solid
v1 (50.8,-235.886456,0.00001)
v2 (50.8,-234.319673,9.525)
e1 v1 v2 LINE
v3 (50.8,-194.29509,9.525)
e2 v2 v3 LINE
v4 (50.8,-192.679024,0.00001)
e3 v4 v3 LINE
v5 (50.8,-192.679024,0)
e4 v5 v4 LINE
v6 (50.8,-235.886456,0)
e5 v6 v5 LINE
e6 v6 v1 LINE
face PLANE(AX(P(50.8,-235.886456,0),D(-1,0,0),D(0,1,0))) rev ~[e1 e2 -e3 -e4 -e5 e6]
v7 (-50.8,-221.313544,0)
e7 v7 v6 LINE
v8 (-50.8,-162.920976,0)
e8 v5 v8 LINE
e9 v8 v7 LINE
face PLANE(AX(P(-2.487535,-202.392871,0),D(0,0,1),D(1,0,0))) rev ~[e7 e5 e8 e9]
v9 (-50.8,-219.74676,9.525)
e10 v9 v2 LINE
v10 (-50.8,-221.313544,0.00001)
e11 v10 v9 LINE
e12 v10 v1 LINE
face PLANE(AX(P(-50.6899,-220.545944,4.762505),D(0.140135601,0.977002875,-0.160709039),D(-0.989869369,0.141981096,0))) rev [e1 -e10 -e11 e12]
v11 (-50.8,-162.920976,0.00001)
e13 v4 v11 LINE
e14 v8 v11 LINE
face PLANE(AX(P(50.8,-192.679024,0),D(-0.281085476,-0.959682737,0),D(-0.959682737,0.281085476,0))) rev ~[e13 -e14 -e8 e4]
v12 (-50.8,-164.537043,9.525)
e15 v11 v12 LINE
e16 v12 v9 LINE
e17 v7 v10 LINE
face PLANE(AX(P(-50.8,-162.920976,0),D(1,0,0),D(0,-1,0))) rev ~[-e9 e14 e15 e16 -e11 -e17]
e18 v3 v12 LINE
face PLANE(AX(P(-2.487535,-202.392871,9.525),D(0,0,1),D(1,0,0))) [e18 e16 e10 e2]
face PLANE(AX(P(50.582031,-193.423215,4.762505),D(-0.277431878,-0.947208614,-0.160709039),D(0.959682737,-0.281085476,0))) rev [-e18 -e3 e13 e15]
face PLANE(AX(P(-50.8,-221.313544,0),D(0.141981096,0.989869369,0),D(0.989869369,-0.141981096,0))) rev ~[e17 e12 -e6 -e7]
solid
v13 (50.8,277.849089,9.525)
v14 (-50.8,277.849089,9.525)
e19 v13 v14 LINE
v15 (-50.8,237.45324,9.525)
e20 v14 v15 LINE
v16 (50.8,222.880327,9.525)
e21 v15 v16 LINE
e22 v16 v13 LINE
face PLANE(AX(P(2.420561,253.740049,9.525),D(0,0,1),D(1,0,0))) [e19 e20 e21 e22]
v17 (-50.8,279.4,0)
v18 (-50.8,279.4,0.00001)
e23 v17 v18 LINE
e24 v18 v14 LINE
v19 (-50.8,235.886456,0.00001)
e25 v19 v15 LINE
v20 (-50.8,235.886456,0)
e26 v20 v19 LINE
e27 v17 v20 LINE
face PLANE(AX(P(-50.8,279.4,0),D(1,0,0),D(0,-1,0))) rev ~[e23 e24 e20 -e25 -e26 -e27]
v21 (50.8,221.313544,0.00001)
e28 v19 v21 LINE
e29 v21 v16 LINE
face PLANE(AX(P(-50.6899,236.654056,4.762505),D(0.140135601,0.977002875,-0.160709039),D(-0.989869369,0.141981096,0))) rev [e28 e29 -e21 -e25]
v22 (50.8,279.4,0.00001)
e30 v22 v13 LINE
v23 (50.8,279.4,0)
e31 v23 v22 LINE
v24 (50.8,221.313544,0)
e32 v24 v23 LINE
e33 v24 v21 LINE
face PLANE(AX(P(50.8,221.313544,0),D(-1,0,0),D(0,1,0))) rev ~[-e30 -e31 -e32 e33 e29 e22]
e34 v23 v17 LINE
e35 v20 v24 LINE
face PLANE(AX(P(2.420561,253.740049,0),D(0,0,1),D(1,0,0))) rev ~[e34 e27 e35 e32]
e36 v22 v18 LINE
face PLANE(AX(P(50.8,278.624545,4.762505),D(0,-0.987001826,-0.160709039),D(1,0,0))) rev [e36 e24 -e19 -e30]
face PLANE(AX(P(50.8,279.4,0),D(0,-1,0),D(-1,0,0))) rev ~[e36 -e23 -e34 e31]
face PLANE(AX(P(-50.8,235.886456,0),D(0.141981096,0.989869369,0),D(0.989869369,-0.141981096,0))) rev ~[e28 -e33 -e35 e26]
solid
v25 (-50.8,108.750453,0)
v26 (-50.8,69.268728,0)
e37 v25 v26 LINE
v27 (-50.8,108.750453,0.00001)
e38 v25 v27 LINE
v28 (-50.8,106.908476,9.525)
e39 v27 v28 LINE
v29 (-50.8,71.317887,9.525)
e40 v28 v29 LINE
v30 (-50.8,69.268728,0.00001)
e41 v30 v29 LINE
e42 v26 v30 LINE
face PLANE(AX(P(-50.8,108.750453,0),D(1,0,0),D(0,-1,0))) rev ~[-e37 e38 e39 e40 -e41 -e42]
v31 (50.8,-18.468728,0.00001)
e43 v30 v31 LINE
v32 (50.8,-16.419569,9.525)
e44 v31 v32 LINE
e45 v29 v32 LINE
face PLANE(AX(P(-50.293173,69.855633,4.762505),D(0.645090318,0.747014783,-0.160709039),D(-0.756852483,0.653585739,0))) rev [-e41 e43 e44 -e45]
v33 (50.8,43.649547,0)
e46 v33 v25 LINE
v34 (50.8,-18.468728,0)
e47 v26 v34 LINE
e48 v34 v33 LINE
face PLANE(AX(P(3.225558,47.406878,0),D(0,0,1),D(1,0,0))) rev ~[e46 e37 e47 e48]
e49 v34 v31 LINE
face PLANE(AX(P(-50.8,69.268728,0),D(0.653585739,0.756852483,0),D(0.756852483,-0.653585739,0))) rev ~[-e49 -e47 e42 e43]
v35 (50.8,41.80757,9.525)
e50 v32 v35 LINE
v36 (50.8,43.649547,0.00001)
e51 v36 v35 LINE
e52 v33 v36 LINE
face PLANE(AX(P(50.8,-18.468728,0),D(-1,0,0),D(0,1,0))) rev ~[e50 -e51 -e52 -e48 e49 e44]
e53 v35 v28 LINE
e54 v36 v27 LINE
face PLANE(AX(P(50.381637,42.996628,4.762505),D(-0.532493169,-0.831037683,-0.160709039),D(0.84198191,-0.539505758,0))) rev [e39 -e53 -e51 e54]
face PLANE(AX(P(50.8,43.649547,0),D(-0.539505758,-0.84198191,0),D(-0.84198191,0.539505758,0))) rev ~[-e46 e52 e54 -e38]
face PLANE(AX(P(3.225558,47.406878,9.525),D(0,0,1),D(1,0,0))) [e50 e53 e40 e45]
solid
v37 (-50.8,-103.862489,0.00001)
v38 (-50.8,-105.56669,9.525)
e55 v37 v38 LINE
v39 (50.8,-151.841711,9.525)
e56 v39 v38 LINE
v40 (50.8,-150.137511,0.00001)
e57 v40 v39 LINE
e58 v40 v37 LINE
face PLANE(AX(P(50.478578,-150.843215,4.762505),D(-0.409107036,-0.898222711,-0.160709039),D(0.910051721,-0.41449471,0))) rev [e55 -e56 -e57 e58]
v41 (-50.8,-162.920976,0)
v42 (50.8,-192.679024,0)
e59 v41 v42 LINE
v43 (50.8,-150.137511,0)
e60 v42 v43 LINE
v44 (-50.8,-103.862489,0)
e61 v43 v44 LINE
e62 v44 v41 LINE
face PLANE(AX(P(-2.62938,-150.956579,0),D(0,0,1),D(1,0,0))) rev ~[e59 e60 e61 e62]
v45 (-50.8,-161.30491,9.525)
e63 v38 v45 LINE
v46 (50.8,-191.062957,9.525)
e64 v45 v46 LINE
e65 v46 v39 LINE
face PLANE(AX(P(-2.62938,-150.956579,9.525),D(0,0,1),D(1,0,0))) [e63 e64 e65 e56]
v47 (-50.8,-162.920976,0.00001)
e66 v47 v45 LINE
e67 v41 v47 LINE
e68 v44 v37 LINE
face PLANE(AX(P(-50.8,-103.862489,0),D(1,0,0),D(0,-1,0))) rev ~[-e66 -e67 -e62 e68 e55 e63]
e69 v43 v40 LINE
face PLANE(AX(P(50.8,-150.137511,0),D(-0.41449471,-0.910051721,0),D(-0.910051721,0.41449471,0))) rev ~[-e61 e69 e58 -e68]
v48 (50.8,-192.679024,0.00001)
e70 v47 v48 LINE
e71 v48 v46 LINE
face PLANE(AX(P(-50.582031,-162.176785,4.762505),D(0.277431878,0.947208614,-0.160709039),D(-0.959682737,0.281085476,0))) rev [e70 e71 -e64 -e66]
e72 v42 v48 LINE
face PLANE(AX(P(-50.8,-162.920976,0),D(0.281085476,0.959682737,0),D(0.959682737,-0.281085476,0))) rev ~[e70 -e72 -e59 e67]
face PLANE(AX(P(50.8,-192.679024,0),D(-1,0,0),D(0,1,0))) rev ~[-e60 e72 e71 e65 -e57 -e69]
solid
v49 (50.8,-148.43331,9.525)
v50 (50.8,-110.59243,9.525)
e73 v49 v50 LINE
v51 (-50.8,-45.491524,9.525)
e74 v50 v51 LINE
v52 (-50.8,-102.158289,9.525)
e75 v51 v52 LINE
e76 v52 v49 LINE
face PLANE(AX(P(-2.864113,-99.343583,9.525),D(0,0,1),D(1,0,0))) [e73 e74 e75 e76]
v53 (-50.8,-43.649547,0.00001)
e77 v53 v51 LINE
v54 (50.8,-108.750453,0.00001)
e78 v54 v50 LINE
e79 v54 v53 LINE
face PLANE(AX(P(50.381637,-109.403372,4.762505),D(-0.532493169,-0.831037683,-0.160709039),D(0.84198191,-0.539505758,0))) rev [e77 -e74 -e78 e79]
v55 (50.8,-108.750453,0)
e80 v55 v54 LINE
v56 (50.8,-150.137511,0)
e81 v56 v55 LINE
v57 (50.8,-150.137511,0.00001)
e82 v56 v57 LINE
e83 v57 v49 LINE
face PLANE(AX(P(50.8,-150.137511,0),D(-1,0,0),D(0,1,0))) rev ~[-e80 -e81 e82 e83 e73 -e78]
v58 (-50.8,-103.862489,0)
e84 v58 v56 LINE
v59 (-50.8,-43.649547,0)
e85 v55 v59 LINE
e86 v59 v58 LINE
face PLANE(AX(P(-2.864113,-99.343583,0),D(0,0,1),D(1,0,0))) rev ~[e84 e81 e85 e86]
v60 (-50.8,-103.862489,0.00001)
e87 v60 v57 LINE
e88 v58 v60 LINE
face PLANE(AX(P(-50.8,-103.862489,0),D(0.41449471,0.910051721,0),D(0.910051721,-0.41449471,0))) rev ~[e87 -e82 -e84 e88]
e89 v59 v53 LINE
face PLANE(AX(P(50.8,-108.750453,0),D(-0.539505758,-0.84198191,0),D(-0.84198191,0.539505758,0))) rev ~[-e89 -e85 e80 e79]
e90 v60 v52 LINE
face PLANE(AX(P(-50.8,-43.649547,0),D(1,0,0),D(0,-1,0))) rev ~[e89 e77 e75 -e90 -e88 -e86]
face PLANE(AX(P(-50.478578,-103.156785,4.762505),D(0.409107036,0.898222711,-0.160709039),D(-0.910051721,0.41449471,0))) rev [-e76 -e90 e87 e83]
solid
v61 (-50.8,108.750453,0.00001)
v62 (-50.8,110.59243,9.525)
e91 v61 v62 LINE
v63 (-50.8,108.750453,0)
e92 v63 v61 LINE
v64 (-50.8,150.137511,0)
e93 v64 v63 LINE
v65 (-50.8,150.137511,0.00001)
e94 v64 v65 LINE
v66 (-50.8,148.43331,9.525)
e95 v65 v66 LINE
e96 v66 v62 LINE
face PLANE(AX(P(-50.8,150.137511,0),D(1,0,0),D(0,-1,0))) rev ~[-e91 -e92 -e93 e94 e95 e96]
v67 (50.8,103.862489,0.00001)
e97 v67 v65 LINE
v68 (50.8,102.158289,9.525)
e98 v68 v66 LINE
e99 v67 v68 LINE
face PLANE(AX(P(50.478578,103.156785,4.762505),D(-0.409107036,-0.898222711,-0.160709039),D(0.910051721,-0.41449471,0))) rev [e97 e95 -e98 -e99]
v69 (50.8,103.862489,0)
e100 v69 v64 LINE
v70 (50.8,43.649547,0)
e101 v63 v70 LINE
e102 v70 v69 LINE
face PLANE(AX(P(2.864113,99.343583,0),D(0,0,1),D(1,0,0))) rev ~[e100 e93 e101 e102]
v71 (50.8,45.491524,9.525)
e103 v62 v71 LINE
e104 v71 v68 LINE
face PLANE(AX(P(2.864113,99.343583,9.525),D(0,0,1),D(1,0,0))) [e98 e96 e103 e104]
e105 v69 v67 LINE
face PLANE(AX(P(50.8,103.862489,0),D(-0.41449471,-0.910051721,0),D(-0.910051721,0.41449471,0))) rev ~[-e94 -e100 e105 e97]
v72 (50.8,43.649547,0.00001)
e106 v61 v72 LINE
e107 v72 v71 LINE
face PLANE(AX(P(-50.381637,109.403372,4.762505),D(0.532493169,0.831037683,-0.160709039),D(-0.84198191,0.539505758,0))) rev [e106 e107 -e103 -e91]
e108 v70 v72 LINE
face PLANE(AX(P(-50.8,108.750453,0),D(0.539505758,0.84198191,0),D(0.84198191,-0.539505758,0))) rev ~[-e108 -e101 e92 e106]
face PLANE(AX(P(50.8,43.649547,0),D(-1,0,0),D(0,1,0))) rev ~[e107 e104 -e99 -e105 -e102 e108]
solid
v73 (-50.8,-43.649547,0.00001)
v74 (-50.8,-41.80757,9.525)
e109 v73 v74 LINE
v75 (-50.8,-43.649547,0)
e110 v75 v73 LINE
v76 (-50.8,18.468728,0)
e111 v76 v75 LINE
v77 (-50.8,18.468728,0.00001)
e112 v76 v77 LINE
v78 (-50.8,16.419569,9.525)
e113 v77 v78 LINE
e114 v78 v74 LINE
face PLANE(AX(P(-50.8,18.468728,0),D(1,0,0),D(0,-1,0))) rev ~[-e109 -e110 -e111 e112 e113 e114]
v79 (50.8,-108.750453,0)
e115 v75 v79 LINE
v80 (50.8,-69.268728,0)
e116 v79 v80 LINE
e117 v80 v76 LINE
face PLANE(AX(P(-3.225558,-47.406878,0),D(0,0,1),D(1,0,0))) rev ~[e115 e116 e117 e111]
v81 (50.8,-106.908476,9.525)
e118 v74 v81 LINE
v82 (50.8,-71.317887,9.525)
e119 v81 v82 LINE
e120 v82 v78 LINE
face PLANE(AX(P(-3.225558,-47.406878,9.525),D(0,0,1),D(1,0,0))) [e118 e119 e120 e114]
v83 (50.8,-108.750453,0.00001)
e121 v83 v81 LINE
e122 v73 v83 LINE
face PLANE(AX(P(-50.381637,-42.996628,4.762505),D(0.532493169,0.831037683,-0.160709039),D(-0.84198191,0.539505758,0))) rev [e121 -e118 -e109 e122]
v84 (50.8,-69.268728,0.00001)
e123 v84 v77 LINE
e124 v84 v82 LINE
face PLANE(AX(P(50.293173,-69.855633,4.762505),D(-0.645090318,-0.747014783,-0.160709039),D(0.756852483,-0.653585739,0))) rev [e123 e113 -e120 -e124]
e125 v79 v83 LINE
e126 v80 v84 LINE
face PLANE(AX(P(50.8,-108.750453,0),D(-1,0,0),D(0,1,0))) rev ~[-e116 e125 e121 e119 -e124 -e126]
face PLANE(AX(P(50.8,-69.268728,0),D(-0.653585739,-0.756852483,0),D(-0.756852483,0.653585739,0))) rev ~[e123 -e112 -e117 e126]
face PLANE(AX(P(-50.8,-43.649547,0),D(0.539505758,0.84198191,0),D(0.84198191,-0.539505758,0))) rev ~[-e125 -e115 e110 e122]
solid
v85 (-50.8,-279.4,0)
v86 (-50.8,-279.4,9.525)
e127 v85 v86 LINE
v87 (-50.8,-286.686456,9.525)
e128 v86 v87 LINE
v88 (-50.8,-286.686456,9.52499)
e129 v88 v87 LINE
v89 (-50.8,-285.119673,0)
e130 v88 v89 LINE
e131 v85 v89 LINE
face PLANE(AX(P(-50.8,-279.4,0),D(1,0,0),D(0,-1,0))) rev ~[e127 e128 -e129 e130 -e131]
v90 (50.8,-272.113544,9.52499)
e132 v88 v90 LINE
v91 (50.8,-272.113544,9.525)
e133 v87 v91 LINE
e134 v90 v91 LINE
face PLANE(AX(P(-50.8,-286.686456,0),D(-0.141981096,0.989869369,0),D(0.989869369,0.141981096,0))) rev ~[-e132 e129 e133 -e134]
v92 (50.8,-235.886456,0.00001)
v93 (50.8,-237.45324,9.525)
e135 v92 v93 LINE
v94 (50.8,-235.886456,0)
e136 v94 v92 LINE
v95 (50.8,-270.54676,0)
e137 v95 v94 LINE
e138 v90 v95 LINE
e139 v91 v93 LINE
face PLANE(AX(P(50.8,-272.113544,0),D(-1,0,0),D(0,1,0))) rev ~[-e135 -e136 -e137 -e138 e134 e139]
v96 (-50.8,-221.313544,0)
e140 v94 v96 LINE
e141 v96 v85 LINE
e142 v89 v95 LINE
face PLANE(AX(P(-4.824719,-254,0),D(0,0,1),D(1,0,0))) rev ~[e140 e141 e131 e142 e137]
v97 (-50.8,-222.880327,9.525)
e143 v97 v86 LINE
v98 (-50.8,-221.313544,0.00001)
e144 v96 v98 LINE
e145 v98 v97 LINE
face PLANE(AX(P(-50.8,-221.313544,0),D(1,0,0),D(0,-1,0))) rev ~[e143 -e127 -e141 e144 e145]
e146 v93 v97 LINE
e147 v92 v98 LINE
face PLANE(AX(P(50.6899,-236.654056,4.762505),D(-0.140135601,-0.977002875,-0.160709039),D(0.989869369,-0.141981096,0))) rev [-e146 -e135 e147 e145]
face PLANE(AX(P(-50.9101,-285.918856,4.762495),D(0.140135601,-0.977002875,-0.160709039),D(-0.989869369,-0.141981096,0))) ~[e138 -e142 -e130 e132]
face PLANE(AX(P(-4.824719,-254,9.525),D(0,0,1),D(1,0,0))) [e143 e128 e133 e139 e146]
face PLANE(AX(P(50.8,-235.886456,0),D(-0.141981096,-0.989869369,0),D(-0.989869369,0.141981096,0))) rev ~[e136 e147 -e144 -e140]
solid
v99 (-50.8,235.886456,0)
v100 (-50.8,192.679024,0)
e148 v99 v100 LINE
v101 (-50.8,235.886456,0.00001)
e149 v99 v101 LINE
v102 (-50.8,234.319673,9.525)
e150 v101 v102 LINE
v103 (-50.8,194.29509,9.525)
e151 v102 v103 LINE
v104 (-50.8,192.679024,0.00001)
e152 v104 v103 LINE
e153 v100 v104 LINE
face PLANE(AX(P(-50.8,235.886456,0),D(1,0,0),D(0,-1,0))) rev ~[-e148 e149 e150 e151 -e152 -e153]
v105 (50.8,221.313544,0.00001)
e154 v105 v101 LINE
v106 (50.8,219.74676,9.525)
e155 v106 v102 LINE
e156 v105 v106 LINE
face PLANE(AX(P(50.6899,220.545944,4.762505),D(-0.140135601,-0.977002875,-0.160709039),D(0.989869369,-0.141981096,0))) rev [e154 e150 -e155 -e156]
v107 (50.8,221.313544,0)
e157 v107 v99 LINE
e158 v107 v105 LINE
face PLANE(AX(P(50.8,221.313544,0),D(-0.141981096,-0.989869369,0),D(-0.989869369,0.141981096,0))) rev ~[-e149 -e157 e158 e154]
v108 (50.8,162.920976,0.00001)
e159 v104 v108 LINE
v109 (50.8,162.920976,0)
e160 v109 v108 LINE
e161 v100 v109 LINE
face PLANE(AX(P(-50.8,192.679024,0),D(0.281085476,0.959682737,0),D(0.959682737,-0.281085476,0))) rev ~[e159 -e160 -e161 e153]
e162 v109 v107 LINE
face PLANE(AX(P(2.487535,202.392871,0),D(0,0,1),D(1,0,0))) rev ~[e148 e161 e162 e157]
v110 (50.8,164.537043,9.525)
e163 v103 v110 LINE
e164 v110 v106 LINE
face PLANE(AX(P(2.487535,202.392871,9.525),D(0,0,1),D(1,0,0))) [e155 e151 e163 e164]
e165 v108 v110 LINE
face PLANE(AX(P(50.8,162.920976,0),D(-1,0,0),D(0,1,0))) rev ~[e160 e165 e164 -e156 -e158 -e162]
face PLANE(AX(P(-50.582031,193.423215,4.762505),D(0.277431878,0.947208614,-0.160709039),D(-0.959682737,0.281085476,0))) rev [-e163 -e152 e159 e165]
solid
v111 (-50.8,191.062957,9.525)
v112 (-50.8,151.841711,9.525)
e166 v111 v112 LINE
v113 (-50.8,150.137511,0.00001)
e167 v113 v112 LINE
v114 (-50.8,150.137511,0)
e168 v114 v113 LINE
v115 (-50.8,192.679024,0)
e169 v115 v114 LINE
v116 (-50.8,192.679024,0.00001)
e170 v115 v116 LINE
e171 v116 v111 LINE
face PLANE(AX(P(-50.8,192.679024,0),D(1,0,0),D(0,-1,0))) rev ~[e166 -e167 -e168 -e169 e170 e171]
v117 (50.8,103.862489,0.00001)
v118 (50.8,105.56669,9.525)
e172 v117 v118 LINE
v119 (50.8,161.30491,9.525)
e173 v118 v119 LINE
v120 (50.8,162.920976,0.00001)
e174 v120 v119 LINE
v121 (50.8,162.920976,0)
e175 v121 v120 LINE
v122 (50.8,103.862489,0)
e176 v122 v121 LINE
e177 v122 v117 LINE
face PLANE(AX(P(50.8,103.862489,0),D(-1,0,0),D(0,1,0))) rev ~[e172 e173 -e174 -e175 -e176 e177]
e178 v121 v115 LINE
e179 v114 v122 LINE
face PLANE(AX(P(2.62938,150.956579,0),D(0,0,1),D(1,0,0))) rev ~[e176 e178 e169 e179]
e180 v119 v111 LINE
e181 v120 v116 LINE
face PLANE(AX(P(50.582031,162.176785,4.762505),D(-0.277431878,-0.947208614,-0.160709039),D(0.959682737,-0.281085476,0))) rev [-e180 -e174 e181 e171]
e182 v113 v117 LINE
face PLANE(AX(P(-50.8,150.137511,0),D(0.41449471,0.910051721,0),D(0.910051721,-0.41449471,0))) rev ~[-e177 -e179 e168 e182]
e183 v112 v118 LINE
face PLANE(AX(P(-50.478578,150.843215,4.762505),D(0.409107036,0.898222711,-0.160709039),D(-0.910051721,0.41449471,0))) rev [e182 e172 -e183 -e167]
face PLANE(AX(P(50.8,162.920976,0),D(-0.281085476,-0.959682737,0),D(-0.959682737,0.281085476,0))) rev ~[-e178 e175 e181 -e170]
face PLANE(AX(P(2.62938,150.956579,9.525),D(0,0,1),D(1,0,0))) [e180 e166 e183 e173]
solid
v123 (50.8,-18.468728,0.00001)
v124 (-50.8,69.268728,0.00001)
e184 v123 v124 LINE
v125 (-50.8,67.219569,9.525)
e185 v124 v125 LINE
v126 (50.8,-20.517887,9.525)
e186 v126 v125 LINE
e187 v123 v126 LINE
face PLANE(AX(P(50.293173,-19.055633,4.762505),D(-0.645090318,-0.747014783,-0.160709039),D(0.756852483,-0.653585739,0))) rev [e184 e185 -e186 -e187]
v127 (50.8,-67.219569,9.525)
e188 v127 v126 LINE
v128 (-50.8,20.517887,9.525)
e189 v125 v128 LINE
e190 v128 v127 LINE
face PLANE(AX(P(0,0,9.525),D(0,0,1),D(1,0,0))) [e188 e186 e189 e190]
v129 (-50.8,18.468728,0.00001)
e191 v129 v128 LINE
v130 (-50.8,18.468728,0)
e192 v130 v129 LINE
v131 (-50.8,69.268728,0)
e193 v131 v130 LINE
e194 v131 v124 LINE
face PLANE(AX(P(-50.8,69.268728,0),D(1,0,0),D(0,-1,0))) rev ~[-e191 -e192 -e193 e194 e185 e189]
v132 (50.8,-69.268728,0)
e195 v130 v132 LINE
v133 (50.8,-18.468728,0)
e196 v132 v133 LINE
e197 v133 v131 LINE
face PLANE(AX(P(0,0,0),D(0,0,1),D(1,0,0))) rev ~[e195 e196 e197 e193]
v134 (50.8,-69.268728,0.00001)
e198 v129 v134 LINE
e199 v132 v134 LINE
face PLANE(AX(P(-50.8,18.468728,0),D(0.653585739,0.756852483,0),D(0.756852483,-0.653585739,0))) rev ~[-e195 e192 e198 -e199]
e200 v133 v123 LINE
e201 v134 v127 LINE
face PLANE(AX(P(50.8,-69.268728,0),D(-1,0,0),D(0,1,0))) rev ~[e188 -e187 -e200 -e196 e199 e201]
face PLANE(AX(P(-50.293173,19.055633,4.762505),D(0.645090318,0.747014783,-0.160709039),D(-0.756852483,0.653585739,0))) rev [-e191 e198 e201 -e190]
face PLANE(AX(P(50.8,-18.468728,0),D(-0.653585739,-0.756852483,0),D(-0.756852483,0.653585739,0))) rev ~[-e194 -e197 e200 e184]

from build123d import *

# Parameters (mm, degrees)
F2_DEPTH    = 9.525
F3_DEPTH    = 9.525
F4_DEPTH    = 9.525
F5_DEPTH    = 9.525
F6_DEPTH    = 9.525
F7_DEPTH    = 9.525
F8_DEPTH    = 9.525
F9_DEPTH    = 9.525
F10_DEPTH   = 9.525
F11_DEPTH   = 9.525
F12_DEPTH   = 9.525
F13_SIZE2   = 1.550911
F13_SIZE    = 9.52499
F13_2_SIZE2 = 1.550911
F13_2_SIZE  = 9.52499
F14_SIZE2   = 1.550911
F14_SIZE    = 9.52499
F14_2_SIZE2 = 1.550911
F14_2_SIZE  = 9.52499
F15_SIZE2   = 1.550911
F15_SIZE    = 9.52499
F15_2_SIZE2 = 1.550911
F15_2_SIZE  = 9.52499
F16_SIZE2   = 1.550911
F16_SIZE    = 9.52499
F16_2_SIZE2 = 1.550911
F16_2_SIZE  = 9.52499
F17_SIZE2   = 1.550911
F17_SIZE    = 9.52499
F17_2_SIZE2 = 1.550911
F17_2_SIZE  = 9.52499
F18_SIZE2   = 1.550911
F18_SIZE    = 9.52499
F18_2_SIZE2 = 1.550911
F18_2_SIZE  = 9.52499
F19_SIZE2   = 1.550911
F19_SIZE    = 9.52499
F19_2_SIZE2 = 1.550911
F19_2_SIZE  = 9.52499
F20_SIZE2   = 1.550911
F20_SIZE    = 9.52499
F20_2_SIZE2 = 1.550911
F20_2_SIZE  = 9.52499
F21_SIZE2   = 1.550911
F21_SIZE    = 9.52499
F21_2_SIZE2 = 1.550911
F21_2_SIZE  = 9.52499
F22_SIZE2   = 1.550911
F22_SIZE    = 9.52499
F22_2_SIZE2 = 1.550911
F22_2_SIZE  = 9.52499
F23_SIZE2   = 1.550911
F23_SIZE    = 9.52499
F24_SIZE2   = 1.550911
F24_SIZE    = 9.52499


# Not quite as in the source:
# - a fillet or chamfer is up to 0.001 mm smaller than in the source, because OpenCascade refuses the exact size


with BuildPart() as f2:
    # F1 (on Top) → F2 (new body)
    with BuildSketch(Plane.XY):
        Polygon((50.8, 279.4), (-50.8, 279.4), (-50.8, 235.8864560812), (50.8, 221.3135439188), align=None)
    extrude(amount=F2_DEPTH)

    # F13 (size 9.525 and 1.5509205186 in the source; OpenCascade refuses exactly that, so slightly less here)
    f13_edges = [f2.edges().sort_by_distance(p)[0] for p in [
        (0, 228.6, 9.525),
    ]]
    f13_side = f2.faces().sort_by_distance((0, 228.6, 4.7625))[0]
    chamfer(f13_edges, length=F13_SIZE, length2=F13_SIZE2, reference=f13_side)

    # F13#2 (size 9.525 and 1.5509205186 in the source; OpenCascade refuses exactly that, so slightly less here)
    f13_2_edges = [f2.edges().sort_by_distance(p)[0] for p in [
        (0, 279.4, 9.525),
    ]]
    f13_2_side = f2.faces().sort_by_distance((0, 279.4, 4.7625))[0]
    chamfer(f13_2_edges, length=F13_2_SIZE, length2=F13_2_SIZE2, reference=f13_2_side)


with BuildPart() as f3:
    # F1 (on Top) → F3 (new body)
    with BuildSketch(Plane.XY):
        Polygon((50.8, 221.3135439188), (-50.8, 235.8864560812), (-50.8, 192.6790237109), (50.8, 162.9209762891), align=None)
    extrude(amount=F3_DEPTH)

    # F14 (size 9.525 and 1.5509205186 in the source; OpenCascade refuses exactly that, so slightly less here)
    f14_edges = [f3.edges().sort_by_distance(p)[0] for p in [
        (0, 228.6, 9.525),
    ]]
    f14_side = f3.faces().sort_by_distance((0, 228.6, 4.7625))[0]
    chamfer(f14_edges, length=F14_SIZE, length2=F14_SIZE2, reference=f14_side)

    # F14#2 (size 9.525 and 1.5509205186 in the source; OpenCascade refuses exactly that, so slightly less here)
    f14_2_edges = [f3.edges().sort_by_distance(p)[0] for p in [
        (0, 177.8, 9.525),
    ]]
    f14_2_side = f3.faces().sort_by_distance((0, 177.8, 4.7625))[0]
    chamfer(f14_2_edges, length=F14_2_SIZE, length2=F14_2_SIZE2, reference=f14_2_side)


with BuildPart() as f4:
    # F1 (on Top) → F4 (new body)
    with BuildSketch(Plane.XY):
        Polygon((50.8, 162.9209762891), (-50.8, 192.6790237109), (-50.8, 150.1375105152), (50.8, 103.8624894848), align=None)
    extrude(amount=F4_DEPTH)

    # F15 (size 9.525 and 1.5509205186 in the source; OpenCascade refuses exactly that, so slightly less here)
    f15_edges = [f4.edges().sort_by_distance(p)[0] for p in [
        (0, 177.8, 9.525),
    ]]
    f15_side = f4.faces().sort_by_distance((0, 177.8, 4.7625))[0]
    chamfer(f15_edges, length=F15_SIZE, length2=F15_SIZE2, reference=f15_side)

    # F15#2 (size 9.525 and 1.5509205186 in the source; OpenCascade refuses exactly that, so slightly less here)
    f15_2_edges = [f4.edges().sort_by_distance(p)[0] for p in [
        (0, 127, 9.525),
    ]]
    f15_2_side = f4.faces().sort_by_distance((0, 127, 4.7625))[0]
    chamfer(f15_2_edges, length=F15_2_SIZE, length2=F15_2_SIZE2, reference=f15_2_side)


with BuildPart() as f5:
    # F1 (on Top) → F5 (new body)
    with BuildSketch(Plane.XY):
        Polygon((50.8, 103.8624894848), (-50.8, 150.1375105152), (-50.8, 108.75045291), (50.8, 43.64954709), align=None)
    extrude(amount=F5_DEPTH)

    # F16 (size 9.525 and 1.5509205186 in the source; OpenCascade refuses exactly that, so slightly less here)
    f16_edges = [f5.edges().sort_by_distance(p)[0] for p in [
        (0, 127, 9.525),
    ]]
    f16_side = f5.faces().sort_by_distance((0, 127, 4.7625))[0]
    chamfer(f16_edges, length=F16_SIZE, length2=F16_SIZE2, reference=f16_side)

    # F16#2 (size 9.525 and 1.5509205186 in the source; OpenCascade refuses exactly that, so slightly less here)
    f16_2_edges = [f5.edges().sort_by_distance(p)[0] for p in [
        (0, 76.2, 9.525),
    ]]
    f16_2_side = f5.faces().sort_by_distance((0, 76.2, 4.7625))[0]
    chamfer(f16_2_edges, length=F16_2_SIZE, length2=F16_2_SIZE2, reference=f16_2_side)


with BuildPart() as f6:
    # F1 (on Top) → F6 (new body)
    with BuildSketch(Plane.XY):
        Polygon((50.8, 43.64954709), (-50.8, 108.75045291), (-50.8, 69.2687277608), (50.8, -18.4687277608), align=None)
    extrude(amount=F6_DEPTH)

    # F17 (size 9.525 and 1.5509205186 in the source; OpenCascade refuses exactly that, so slightly less here)
    f17_edges = [f6.edges().sort_by_distance(p)[0] for p in [
        (0, 25.4, 9.525),
    ]]
    f17_side = f6.faces().sort_by_distance((0, 25.4, 4.7625))[0]
    chamfer(f17_edges, length=F17_SIZE, length2=F17_SIZE2, reference=f17_side)

    # F17#2 (size 9.525 and 1.5509205186 in the source; OpenCascade refuses exactly that, so slightly less here)
    f17_2_edges = [f6.edges().sort_by_distance(p)[0] for p in [
        (0, 76.2, 9.525),
    ]]
    f17_2_side = f6.faces().sort_by_distance((0, 76.2, 4.7625))[0]
    chamfer(f17_2_edges, length=F17_2_SIZE, length2=F17_2_SIZE2, reference=f17_2_side)


with BuildPart() as f7:
    # F1 (on Top) → F7 (new body)
    with BuildSketch(Plane.XY):
        Polygon((50.8, -18.4687277608), (-50.8, 69.2687277608), (-50.8, 18.4687277609), (50.7999999999, -69.2687277608), align=None)
    extrude(amount=F7_DEPTH)

    # F18 (size 9.525 and 1.5509205186 in the source; OpenCascade refuses exactly that, so slightly less here)
    f18_edges = [f7.edges().sort_by_distance(p)[0] for p in [
        (0, 25.4, 9.525),
    ]]
    f18_side = f7.faces().sort_by_distance((0, 25.4, 4.7625))[0]
    chamfer(f18_edges, length=F18_SIZE, length2=F18_SIZE2, reference=f18_side)

    # F18#2 (size 9.525 and 1.5509205186 in the source; OpenCascade refuses exactly that, so slightly less here)
    f18_2_edges = [f7.edges().sort_by_distance(p)[0] for p in [
        (0, -25.4, 9.525),
    ]]
    f18_2_side = f7.faces().sort_by_distance((0, -25.4, 4.7625))[0]
    chamfer(f18_2_edges, length=F18_2_SIZE, length2=F18_2_SIZE2, reference=f18_2_side)


with BuildPart() as f8:
    # F1 (on Top) → F8 (new body)
    with BuildSketch(Plane.XY):
        Polygon((50.7999999999, -69.2687277608), (-50.8000000001, 18.4687277609), (-50.8, -43.64954709), (50.7999999999, -108.7504529099), align=None)
    extrude(amount=F8_DEPTH)

    # F19 (size 9.525 and 1.5509205186 in the source; OpenCascade refuses exactly that, so slightly less here)
    f19_edges = [f8.edges().sort_by_distance(p)[0] for p in [
        (0, -25.4, 9.525),
    ]]
    f19_side = f8.faces().sort_by_distance((0, -25.4, 4.7625))[0]
    chamfer(f19_edges, length=F19_SIZE, length2=F19_SIZE2, reference=f19_side)

    # F19#2 (size 9.525 and 1.5509205186 in the source; OpenCascade refuses exactly that, so slightly less here)
    f19_2_edges = [f8.edges().sort_by_distance(p)[0] for p in [
        (0, -76.2, 9.525),
    ]]
    f19_2_side = f8.faces().sort_by_distance((0, -76.2, 4.7625))[0]
    chamfer(f19_2_edges, length=F19_2_SIZE, length2=F19_2_SIZE2, reference=f19_2_side)


with BuildPart() as f9:
    # F1 (on Top) → F9 (new body)
    with BuildSketch(Plane.XY):
        Polygon((50.7999999999, -108.7504529099), (-50.8000000001, -43.64954709), (-50.8, -103.8624894848), (50.7999999999, -150.1375105152), align=None)
    extrude(amount=F9_DEPTH)

    # F20 (size 9.525 and 1.5509205186 in the source; OpenCascade refuses exactly that, so slightly less here)
    f20_edges = [f9.edges().sort_by_distance(p)[0] for p in [
        (0, -76.2, 9.525),
    ]]
    f20_side = f9.faces().sort_by_distance((0, -76.2, 4.7625))[0]
    chamfer(f20_edges, length=F20_SIZE, length2=F20_SIZE2, reference=f20_side)

    # F20#2 (size 9.525 and 1.5509205186 in the source; OpenCascade refuses exactly that, so slightly less here)
    f20_2_edges = [f9.edges().sort_by_distance(p)[0] for p in [
        (0, -127, 9.525),
    ]]
    f20_2_side = f9.faces().sort_by_distance((0, -127, 4.7625))[0]
    chamfer(f20_2_edges, length=F20_2_SIZE, length2=F20_2_SIZE2, reference=f20_2_side)


with BuildPart() as f10:
    # F1 (on Top) → F10 (new body)
    with BuildSketch(Plane.XY):
        Polygon((50.7999999999, -150.1375105152), (-50.8000000001, -103.8624894848), (-50.8, -162.9209762891), (50.7999999999, -192.6790237109), align=None)
    extrude(amount=F10_DEPTH)

    # F21 (size 9.525 and 1.5509205186 in the source; OpenCascade refuses exactly that, so slightly less here)
    f21_edges = [f10.edges().sort_by_distance(p)[0] for p in [
        (0, -127, 9.525),
    ]]
    f21_side = f10.faces().sort_by_distance((0, -127, 4.7625))[0]
    chamfer(f21_edges, length=F21_SIZE, length2=F21_SIZE2, reference=f21_side)

    # F21#2 (size 9.525 and 1.5509205186 in the source; OpenCascade refuses exactly that, so slightly less here)
    f21_2_edges = [f10.edges().sort_by_distance(p)[0] for p in [
        (0, -177.8, 9.525),
    ]]
    f21_2_side = f10.faces().sort_by_distance((0, -177.8, 4.7625))[0]
    chamfer(f21_2_edges, length=F21_2_SIZE, length2=F21_2_SIZE2, reference=f21_2_side)


with BuildPart() as f11:
    # F1 (on Top) → F11 (new body)
    with BuildSketch(Plane.XY):
        Polygon((50.7999999999, -192.6790237109), (-50.8000000001, -162.9209762891), (-50.8, -221.3135439188), (50.7999999999, -235.8864560811), align=None)
    extrude(amount=F11_DEPTH)

    # F22 (size 9.525 and 1.5509205186 in the source; OpenCascade refuses exactly that, so slightly less here)
    f22_edges = [f11.edges().sort_by_distance(p)[0] for p in [
        (0, -177.8, 9.525),
    ]]
    f22_side = f11.faces().sort_by_distance((0, -177.8, 4.7625))[0]
    chamfer(f22_edges, length=F22_SIZE, length2=F22_SIZE2, reference=f22_side)

    # F22#2 (size 9.525 and 1.5509205186 in the source; OpenCascade refuses exactly that, so slightly less here)
    f22_2_edges = [f11.edges().sort_by_distance(p)[0] for p in [
        (0, -228.6, 9.525),
    ]]
    f22_2_side = f11.faces().sort_by_distance((0, -228.6, 4.7625))[0]
    chamfer(f22_2_edges, length=F22_2_SIZE, length2=F22_2_SIZE2, reference=f22_2_side)


with BuildPart() as f12:
    # F1 (on Top) → F12 (new body)
    with BuildSketch(Plane.XY):
        Polygon((50.7999999999, -235.8864560811), (-50.8000000001, -221.3135439188), (-50.8, -279.4), (-50.8, -286.6864560812), (50.8, -272.1135439188), align=None)
    extrude(amount=F12_DEPTH)

    # F23 (size 9.525 and 1.5509205186 in the source; OpenCascade refuses exactly that, so slightly less here)
    f23_edges = [f12.edges().sort_by_distance(p)[0] for p in [
        (0, -228.6, 9.525),
    ]]
    f23_side = f12.faces().sort_by_distance((0, -228.6, 4.7625))[0]
    chamfer(f23_edges, length=F23_SIZE, length2=F23_SIZE2, reference=f23_side)

    # F24 (size 9.525 and 1.5509205186 in the source; OpenCascade refuses exactly that, so slightly less here)
    f24_edges = [f12.edges().sort_by_distance(p)[0] for p in [
        (0, -279.4, 0),
    ]]
    f24_side = f12.faces().sort_by_distance((0, -279.4, 4.7625))[0]
    chamfer(f24_edges, length=F24_SIZE, length2=F24_SIZE2, reference=f24_side)


solid = Compound([f2.part, f3.part, f4.part, f5.part, f6.part, f7.part, f8.part, f9.part, f10.part, f11.part, f12.part])
